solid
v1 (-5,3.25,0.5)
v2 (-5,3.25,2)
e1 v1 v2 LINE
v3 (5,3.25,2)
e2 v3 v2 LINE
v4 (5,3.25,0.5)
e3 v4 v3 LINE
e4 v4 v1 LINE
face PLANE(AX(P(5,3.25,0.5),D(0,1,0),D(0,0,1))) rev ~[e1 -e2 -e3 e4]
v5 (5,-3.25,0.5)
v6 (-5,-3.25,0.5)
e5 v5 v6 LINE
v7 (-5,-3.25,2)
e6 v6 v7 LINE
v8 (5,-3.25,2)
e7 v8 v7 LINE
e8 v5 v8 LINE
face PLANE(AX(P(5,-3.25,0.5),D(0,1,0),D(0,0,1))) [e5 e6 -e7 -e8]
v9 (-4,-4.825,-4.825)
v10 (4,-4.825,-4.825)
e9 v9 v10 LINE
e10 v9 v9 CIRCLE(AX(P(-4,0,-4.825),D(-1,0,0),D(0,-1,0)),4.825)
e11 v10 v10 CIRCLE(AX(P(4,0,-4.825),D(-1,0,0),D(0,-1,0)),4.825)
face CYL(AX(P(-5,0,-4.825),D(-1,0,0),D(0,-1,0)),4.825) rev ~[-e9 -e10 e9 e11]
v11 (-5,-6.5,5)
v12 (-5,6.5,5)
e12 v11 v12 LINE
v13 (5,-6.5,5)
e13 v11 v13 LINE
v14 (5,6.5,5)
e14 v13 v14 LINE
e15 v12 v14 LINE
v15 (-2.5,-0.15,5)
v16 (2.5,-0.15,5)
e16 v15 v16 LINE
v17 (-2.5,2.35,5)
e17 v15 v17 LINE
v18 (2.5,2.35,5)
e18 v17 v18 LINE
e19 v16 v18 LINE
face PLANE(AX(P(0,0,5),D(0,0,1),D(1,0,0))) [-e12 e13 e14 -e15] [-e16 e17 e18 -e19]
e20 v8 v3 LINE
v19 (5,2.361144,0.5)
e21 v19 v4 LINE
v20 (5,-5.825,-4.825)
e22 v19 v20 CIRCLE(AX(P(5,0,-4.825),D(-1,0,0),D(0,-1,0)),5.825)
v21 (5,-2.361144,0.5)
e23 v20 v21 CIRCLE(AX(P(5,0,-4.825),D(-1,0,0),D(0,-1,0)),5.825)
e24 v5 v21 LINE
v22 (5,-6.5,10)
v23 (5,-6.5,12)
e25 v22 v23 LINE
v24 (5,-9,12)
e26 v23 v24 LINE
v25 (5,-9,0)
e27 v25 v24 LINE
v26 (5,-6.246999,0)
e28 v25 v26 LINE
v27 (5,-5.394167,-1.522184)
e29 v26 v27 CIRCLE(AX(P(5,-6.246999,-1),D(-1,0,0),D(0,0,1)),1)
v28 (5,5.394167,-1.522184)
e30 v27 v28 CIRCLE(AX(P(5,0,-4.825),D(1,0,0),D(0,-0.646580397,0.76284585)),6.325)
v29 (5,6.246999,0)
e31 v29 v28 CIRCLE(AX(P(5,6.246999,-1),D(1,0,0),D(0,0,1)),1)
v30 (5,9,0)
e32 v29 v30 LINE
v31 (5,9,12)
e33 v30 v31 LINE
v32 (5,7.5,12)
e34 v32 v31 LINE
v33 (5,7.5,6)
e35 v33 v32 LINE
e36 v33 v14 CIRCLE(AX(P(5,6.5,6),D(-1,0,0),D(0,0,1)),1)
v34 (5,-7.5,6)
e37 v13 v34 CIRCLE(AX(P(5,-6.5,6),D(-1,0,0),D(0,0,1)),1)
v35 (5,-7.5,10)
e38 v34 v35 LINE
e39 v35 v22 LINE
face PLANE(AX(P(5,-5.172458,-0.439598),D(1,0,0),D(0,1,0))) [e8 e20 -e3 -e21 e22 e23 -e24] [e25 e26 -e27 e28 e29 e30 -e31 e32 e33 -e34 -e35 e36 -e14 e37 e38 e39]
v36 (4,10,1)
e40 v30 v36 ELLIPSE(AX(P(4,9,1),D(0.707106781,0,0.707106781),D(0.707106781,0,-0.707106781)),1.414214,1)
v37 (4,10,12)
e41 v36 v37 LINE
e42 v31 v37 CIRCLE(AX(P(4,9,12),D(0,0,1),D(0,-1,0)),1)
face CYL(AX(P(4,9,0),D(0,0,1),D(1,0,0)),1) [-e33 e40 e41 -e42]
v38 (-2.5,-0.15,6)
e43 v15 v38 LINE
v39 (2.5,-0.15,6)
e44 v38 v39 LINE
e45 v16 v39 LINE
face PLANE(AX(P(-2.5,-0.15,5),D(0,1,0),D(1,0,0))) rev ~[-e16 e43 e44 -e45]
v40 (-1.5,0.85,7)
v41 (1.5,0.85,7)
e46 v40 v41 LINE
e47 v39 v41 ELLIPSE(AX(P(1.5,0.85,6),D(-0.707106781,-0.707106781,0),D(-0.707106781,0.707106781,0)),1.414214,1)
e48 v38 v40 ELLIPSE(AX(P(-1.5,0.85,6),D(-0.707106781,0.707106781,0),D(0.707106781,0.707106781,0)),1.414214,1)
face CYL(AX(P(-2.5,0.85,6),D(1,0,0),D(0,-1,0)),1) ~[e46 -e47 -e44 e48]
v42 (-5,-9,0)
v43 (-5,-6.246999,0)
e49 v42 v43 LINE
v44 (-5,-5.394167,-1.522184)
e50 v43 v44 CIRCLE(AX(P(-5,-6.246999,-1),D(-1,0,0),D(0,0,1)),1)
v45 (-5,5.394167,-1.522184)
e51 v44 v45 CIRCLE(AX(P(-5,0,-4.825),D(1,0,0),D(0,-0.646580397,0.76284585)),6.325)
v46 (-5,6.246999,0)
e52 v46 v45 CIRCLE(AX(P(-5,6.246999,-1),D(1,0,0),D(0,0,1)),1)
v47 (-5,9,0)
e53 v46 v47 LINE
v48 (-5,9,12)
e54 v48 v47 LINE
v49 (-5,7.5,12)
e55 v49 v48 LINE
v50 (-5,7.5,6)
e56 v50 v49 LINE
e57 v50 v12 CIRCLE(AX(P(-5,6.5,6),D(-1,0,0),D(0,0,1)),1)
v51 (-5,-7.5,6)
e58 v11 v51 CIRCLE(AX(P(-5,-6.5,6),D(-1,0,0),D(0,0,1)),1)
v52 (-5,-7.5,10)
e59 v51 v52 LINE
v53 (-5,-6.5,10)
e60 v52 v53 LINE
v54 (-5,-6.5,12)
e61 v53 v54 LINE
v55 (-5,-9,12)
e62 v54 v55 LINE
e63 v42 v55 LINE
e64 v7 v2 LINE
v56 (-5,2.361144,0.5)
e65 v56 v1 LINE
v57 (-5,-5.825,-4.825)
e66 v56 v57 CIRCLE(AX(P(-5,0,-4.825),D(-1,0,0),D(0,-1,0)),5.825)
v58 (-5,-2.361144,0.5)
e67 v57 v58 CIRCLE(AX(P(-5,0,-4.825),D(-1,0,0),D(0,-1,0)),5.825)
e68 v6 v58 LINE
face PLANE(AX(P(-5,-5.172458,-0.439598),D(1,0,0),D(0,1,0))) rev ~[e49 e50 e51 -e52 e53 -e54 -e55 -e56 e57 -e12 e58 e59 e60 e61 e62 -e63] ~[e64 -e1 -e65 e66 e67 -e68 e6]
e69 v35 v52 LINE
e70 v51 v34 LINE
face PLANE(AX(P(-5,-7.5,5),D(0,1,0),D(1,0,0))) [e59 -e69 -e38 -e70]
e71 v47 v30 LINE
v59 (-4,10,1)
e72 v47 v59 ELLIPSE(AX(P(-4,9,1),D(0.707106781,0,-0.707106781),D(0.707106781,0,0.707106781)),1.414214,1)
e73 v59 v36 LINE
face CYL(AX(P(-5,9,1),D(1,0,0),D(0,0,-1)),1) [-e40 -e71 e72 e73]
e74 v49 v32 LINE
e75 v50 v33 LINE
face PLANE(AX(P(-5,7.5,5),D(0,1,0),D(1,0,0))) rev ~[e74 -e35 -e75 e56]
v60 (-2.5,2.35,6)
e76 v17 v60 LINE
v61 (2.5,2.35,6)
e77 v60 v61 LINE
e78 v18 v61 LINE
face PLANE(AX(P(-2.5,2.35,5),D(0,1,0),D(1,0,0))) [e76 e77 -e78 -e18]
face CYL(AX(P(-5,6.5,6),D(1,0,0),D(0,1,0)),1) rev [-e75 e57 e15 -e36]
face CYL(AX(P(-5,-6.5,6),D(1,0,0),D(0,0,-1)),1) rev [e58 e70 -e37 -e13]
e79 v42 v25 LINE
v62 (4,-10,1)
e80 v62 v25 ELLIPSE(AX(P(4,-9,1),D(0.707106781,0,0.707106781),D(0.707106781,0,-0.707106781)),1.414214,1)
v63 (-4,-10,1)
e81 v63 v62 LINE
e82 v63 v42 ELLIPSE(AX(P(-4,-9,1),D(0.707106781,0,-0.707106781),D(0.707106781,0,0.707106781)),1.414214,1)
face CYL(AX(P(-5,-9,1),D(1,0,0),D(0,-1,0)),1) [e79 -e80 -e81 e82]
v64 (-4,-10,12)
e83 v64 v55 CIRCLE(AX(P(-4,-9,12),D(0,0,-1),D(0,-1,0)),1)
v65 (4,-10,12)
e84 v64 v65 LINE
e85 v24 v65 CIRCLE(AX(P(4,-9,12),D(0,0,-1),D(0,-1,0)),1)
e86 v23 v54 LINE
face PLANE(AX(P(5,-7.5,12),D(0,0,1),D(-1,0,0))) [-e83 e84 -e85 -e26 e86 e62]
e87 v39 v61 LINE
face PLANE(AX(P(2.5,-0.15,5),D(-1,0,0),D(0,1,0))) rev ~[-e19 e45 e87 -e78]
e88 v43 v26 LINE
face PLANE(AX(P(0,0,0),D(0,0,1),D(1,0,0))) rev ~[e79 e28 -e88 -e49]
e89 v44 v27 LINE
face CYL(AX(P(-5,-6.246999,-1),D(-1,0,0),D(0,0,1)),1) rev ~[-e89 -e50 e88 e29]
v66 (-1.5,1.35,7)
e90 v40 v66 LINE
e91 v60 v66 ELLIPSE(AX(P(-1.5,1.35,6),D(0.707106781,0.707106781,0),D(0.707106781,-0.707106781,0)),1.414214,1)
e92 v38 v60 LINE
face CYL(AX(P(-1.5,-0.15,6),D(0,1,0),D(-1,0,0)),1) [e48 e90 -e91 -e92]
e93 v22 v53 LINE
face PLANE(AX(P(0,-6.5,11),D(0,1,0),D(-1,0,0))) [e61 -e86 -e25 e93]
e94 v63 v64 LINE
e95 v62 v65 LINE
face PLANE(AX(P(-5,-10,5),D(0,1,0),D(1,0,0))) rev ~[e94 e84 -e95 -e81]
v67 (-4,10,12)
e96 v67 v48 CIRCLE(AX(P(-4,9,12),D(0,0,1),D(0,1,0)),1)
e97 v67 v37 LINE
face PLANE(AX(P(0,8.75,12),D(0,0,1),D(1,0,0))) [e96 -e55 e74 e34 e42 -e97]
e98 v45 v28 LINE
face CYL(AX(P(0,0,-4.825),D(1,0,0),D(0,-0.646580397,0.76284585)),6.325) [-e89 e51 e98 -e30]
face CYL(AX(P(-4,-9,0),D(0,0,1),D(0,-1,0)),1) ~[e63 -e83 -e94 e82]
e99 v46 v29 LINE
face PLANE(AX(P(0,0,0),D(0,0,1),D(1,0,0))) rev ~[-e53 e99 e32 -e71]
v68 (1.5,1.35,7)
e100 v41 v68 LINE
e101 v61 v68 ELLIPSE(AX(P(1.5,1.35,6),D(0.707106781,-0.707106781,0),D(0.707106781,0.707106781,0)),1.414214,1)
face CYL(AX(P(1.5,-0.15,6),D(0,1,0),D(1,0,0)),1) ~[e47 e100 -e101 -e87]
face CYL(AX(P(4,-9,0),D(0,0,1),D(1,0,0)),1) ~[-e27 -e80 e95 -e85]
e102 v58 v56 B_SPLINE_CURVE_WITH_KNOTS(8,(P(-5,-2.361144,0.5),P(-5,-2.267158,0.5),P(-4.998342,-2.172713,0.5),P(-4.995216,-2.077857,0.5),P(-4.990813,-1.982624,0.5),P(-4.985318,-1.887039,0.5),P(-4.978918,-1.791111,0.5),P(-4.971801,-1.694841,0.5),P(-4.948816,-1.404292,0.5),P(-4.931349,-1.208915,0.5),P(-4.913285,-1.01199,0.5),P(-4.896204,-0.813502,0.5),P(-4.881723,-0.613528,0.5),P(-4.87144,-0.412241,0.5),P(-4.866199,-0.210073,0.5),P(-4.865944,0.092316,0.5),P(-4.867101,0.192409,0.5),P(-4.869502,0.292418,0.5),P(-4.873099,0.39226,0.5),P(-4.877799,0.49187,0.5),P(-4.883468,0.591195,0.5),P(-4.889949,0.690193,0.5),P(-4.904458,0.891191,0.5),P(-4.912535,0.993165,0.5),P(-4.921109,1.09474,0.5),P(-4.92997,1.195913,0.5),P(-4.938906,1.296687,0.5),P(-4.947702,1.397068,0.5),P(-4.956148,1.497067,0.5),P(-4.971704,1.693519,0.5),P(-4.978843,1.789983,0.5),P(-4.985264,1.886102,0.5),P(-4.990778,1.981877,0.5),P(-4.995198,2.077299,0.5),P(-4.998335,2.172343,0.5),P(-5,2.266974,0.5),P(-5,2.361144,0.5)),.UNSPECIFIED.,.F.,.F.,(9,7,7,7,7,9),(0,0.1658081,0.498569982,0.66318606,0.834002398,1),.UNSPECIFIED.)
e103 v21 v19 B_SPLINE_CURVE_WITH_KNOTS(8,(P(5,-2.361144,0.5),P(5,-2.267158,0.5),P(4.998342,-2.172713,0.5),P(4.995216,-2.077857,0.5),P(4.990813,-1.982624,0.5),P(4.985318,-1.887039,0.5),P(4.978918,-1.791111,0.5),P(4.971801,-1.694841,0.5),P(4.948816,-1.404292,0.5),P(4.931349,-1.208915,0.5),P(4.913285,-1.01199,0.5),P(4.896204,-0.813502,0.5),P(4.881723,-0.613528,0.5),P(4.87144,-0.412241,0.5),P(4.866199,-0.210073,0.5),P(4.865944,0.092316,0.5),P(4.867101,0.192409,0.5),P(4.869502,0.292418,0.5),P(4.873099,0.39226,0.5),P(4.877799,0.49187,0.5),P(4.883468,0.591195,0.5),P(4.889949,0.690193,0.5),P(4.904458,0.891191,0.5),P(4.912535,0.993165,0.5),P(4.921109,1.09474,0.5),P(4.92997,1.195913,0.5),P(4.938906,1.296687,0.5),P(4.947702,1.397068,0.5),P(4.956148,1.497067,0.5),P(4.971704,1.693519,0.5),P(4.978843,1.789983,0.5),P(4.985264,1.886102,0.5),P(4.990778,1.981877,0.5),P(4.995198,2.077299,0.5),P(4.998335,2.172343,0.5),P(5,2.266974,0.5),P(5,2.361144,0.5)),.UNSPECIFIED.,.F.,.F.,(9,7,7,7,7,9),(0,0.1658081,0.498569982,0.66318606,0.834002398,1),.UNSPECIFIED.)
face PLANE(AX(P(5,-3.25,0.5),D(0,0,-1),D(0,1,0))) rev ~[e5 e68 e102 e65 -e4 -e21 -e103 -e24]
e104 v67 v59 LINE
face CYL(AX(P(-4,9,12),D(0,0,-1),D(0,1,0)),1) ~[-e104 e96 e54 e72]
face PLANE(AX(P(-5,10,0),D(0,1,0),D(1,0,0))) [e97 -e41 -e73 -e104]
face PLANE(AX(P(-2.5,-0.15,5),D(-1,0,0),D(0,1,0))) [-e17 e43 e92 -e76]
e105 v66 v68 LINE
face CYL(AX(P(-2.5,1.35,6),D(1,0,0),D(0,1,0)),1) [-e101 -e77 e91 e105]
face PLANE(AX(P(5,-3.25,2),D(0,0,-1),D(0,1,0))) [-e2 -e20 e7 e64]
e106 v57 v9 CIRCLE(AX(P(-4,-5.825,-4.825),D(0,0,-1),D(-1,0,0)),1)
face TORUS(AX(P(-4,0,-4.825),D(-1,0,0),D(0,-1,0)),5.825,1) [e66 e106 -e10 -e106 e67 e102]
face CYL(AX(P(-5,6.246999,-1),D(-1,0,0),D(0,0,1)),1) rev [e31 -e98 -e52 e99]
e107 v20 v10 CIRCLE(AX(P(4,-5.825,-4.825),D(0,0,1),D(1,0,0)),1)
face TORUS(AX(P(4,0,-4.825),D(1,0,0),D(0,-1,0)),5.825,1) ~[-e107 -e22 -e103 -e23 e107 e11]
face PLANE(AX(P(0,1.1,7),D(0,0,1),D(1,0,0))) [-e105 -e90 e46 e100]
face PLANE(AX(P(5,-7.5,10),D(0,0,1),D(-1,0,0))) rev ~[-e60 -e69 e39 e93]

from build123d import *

# Parameters (mm, degrees)
F0_W         = 10
F0_H         = 20
F1_DEPTH     = 5
F2_W         = 10
F2_H         = 2.5
F3_DEPTH     = 7
F4_W         = 10
F4_H         = 2
F5_DEPTH     = 1
F6_W         = 5
F6_H         = 2.5
F7_DEPTH     = 2
F8_R         = 1
F9_W         = 6.5
F9_H         = 1.5
F10_DEPTH    = 10.001
F12_DEPTH    = 5
F13_R        = 4.825
F14_DEPTH    = 10.001
F15_T1_DEPTH = 10


# Not quite as in the source:
# - a fillet or chamfer that OpenCascade refuses, or shapes differently, is made with other operations: its cross-section is extruded or revolved along the edge and cut away or added


with BuildPart() as f1:
    # F0 (on Top) → F1 (new body)
    with BuildSketch(Plane.XY):
        Rectangle(F0_W, F0_H)
    extrude(amount=F1_DEPTH)

    # F2 (on face) → F3 (join)
    with BuildSketch(Plane.XY.offset(5)):
        with Locations((0, -8.75)):
            Rectangle(F2_W, F2_H)
        with Locations((0, 8.75)):
            Rectangle(F2_W, F2_H)
    extrude(amount=F3_DEPTH)

    # F4 (on face) → F5 (join)
    with BuildSketch(Plane(origin=(0, -7.5, 0), x_dir=(-1, 0, 0), z_dir=(0, 1, 0))):
        with Locations((0, 11)):
            Rectangle(F4_W, F4_H)
    extrude(amount=F5_DEPTH)

    # F6 (on face) → F7 (join)
    with BuildSketch(Plane.XY.offset(5)):
        with Locations((0, 1.1)):
            Rectangle(F6_W, F6_H)
    extrude(amount=F7_DEPTH)

    # F8
    f8_edges = [f1.edges().sort_by_distance(p)[0] for p in [
        (0, 7.5, 5),
        (0, -7.5, 5),
        (0, 10, 0),
        (0, -10, 0),
        (5, -10, 6),
        (-5, -10, 6),
        (5, 10, 6),
        (-5, 10, 6),
        (2.5, 1.1, 7),
        (0, 2.35, 7),
        (-2.5, 1.1, 7),
        (0, -0.15, 7),
    ]]
    fillet(f8_edges, radius=F8_R)

    # F9 (on face) → F10 (cut, through all)
    with BuildSketch(Plane.YZ.offset(5)):
        with Locations((0, 1.25)):
            Rectangle(F9_W, F9_H)
    extrude(amount=-F10_DEPTH, mode=Mode.SUBTRACT)

    # F11 (on Right) → F12 (join, symmetric)
    with BuildSketch(Plane.YZ):
        with BuildLine():
            Line((4.0896210093, 0), (0, 0))
            Line((0, 0), (-4.0896210093, 0))
            ThreePointArc((-4.0896210093, 0), (0, -11.15), (4.0896210093, 0))
        make_face()
        with BuildLine():
            ThreePointArc((0, 0), (3.4117902192, -1.4132097808), (4.825, -4.825))
            ThreePointArc((4.825, -4.825), (-3.4117902192, -8.2367902192), (0, 0))
        make_face(mode=Mode.SUBTRACT)
        with BuildLine():
            ThreePointArc((0, 0), (-3.4117902192, -8.2367902192), (4.825, -4.825))
            ThreePointArc((4.825, -4.825), (3.4117902192, -1.4132097808), (0, 0))
        make_face()
    extrude(amount=F12_DEPTH, both=True)

    # F13 (on face) → F14 (cut, through all)
    with BuildSketch(Plane(origin=(-5, 0, 0), x_dir=(0, -1, 0), z_dir=(-1, 0, 0))):
        with Locations((0, -4.825)):
            Circle(F13_R)
    extrude(amount=-F14_DEPTH, mode=Mode.SUBTRACT)

    # F15: fillet of radius 1 on 4 edges, made by hand

    # F15_s2 → F15_t1 (join)
    with BuildSketch(Plane.YZ.offset(-5)):
        with BuildLine():
            ThreePointArc((-6.2469992797, 0), (-5.3745933247, -0.5112179935), (-5.3941666135, -1.5221843003))
            ThreePointArc((-5.3941666135, -1.5221843003), (-4.8025845312, -0.7090788613), (-4.0896210093, 0))
            Line((-4.0896210093, 0), (-6.2469992797, 0))
        make_face()
        with BuildLine():
            ThreePointArc((6.2469992797, 0), (5.3745933247, -0.5112179935), (5.3941666135, -1.5221843003))
            ThreePointArc((5.3941666135, -1.5221843003), (4.8025845312, -0.7090788613), (4.0896210093, 0))
            Line((4.0896210093, 0), (6.2469992797, 0))
        make_face()
    extrude(amount=F15_T1_DEPTH)

    # F15_s3 → F15_t4 (revolve, cut)
    with BuildSketch(Plane.XY.offset(-4.825)):
        with BuildLine():
            ThreePointArc((-5, -5.825), (-4.7071067812, -5.1178932188), (-4, -4.825))
            Line((-4, -4.825), (-5, -4.825))
            Line((-5, -4.825), (-5, -5.825))
        make_face()
    revolve(axis=Axis((-5, 0, -4.825), (-1, 0, 0)), mode=Mode.SUBTRACT)

    # F15_s5 → F15_t6 (revolve, cut)
    with BuildSketch(Plane.XY.offset(-4.825)):
        with BuildLine():
            ThreePointArc((5, -5.825), (4.7071067812, -5.1178932188), (4, -4.825))
            Line((4, -4.825), (5, -4.825))
            Line((5, -4.825), (5, -5.825))
        make_face()
    revolve(axis=Axis((5, 0, -4.825), (-1, 0, 0)), mode=Mode.SUBTRACT)


solid = f1.part
